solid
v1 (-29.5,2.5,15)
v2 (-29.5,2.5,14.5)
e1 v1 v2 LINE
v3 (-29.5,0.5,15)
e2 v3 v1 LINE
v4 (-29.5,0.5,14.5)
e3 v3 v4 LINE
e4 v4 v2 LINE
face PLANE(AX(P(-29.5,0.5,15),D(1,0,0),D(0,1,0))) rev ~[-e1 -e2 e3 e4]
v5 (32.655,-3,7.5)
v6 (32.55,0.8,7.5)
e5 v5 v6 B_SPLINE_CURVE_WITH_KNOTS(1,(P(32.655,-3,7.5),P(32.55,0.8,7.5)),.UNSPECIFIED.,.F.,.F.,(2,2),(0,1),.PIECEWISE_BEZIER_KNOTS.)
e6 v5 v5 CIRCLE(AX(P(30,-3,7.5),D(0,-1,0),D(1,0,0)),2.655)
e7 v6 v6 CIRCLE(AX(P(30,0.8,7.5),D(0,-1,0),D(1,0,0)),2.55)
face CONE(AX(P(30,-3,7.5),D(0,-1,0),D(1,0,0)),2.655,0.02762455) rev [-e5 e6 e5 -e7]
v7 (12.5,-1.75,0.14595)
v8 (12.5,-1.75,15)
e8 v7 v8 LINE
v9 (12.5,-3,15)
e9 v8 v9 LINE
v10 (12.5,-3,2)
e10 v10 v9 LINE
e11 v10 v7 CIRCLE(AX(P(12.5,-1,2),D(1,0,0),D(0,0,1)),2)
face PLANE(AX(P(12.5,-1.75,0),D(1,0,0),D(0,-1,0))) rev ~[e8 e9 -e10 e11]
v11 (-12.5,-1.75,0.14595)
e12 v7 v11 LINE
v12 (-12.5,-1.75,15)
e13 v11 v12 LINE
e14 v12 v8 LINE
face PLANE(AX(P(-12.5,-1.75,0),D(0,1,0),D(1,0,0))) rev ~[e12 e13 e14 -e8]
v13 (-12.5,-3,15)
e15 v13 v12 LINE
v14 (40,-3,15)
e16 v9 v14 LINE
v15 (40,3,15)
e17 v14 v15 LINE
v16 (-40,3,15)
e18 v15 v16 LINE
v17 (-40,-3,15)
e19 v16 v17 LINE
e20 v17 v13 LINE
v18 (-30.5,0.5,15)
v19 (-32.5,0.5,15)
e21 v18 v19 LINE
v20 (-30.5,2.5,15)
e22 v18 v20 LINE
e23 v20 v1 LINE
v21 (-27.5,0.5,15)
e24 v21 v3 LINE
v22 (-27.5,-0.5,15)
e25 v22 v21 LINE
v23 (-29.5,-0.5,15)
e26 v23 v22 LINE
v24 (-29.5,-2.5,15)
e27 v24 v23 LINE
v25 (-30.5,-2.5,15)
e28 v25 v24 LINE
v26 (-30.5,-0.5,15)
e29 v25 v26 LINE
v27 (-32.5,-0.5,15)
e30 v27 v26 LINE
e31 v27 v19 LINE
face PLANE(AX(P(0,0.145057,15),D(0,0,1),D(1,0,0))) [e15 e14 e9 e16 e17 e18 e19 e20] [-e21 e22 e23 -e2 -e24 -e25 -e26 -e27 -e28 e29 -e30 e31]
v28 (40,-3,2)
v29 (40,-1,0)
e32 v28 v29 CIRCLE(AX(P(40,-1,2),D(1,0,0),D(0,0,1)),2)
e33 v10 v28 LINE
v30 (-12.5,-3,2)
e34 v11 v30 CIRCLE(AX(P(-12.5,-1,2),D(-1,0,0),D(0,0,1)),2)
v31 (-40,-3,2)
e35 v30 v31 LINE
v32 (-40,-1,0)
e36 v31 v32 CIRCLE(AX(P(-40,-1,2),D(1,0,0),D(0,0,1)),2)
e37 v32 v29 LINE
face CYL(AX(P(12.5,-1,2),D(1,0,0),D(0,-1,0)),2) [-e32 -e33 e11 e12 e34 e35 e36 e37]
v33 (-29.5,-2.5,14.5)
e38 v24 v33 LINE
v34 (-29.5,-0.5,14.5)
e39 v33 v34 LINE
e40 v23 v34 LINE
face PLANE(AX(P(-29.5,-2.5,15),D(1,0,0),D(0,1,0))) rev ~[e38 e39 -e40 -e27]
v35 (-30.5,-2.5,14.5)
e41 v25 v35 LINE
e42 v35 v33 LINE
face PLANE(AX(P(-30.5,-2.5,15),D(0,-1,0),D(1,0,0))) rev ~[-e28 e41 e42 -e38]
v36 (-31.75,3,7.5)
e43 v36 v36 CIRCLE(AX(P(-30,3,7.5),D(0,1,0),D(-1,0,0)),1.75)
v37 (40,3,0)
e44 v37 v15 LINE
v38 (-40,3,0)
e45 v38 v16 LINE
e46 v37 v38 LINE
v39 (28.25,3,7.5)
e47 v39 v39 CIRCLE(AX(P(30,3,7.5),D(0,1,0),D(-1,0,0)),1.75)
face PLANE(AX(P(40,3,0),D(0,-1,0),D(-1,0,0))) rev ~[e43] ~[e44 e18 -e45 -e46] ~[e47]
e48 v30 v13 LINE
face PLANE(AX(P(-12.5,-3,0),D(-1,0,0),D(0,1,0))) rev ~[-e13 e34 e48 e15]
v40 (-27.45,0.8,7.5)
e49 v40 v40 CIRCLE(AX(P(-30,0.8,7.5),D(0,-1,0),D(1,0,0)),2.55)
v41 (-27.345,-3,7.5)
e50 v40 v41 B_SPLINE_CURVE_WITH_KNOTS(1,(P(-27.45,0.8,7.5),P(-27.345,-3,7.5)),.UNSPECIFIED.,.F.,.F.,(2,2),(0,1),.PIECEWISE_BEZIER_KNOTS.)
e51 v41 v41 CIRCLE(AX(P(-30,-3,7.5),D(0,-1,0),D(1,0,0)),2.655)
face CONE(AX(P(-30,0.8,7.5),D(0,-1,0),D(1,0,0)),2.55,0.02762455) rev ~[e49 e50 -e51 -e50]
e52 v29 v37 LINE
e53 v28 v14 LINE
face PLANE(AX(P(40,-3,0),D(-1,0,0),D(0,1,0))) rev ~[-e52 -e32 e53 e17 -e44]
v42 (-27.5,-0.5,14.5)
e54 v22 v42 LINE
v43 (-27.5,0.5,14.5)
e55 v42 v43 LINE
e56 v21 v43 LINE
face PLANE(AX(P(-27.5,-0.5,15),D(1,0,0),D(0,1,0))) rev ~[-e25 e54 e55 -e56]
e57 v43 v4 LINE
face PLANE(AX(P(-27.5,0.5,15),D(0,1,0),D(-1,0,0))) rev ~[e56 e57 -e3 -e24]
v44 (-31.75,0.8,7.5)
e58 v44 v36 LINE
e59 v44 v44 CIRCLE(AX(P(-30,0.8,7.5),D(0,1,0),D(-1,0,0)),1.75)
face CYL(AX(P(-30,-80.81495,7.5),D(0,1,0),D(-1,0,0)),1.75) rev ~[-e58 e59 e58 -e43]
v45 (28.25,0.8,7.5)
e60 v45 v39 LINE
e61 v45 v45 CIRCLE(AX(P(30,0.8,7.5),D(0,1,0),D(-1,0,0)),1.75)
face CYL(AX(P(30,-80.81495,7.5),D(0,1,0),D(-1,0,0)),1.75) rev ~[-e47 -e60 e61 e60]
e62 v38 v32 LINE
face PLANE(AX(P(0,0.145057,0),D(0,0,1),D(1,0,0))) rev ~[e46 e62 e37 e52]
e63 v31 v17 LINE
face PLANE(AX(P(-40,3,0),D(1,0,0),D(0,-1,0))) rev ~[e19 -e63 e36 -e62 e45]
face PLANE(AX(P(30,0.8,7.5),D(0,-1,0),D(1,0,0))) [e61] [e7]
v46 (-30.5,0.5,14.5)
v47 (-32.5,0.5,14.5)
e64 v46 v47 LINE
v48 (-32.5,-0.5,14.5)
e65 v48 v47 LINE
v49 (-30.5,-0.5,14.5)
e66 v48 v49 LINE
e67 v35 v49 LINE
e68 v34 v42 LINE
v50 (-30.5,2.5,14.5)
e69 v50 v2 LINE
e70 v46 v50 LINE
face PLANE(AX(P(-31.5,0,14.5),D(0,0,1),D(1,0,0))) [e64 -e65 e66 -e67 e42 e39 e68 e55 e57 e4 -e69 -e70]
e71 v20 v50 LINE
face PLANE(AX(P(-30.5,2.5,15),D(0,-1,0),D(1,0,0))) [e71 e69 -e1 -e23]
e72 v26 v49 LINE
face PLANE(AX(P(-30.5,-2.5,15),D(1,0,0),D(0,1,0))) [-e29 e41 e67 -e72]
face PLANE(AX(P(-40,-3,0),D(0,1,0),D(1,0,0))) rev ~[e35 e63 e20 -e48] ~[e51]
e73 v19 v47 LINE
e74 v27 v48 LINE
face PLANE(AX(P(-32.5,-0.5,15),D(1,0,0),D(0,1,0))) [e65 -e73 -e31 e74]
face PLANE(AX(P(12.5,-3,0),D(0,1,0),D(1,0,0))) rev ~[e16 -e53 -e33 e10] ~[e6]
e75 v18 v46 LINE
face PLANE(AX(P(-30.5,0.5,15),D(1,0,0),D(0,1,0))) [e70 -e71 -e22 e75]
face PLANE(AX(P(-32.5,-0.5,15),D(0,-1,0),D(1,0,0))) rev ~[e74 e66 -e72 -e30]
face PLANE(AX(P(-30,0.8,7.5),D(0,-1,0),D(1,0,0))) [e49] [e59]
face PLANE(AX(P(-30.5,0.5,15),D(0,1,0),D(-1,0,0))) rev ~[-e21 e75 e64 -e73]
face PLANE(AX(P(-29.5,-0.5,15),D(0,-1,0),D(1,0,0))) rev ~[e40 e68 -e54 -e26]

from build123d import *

# Parameters (mm, degrees)
F1_DEPTH  = 15
F4_R      = 2.55
F2_R      = 2.655
F7_D      = 3.5
F8_F1_R   = 2
F9_W      = 2
F9_H      = 1
F9_W_2    = 1
F9_H_2    = 2
F10_DEPTH = 0.5


with BuildPart() as f1:
    # F0 (on Top) → F1 (new body)
    with BuildSketch(Plane.XY):
        Polygon((12.5, -3), (40, -3), (40, 3), (-40, 3), (-40, -3), (-12.5, -3), (-12.5, -1.75), (12.5, -1.75), align=None)
    extrude(amount=F1_DEPTH)

    # F4 (on offset) → F5 section 0
    with BuildSketch(Plane.XZ.offset(-0.8)):
        with Locations((-30, 7.5)):
            Circle(F4_R)
    # F2 (on face) → F5 section 1
    with BuildSketch(Plane.XZ.offset(3)):
        with Locations((-30, 7.5)):
            Circle(F2_R)
    loft(mode=Mode.SUBTRACT)

    # F2 (on face) → F6 section 0
    with BuildSketch(Plane.XZ.offset(3)):
        with Locations((30, 7.5)):
            Circle(F2_R)
    # F4 (on offset) → F6 section 1
    with BuildSketch(Plane.XZ.offset(-0.8)):
        with Locations((30, 7.5)):
            Circle(F4_R)
    loft(mode=Mode.SUBTRACT)

    # F7 (through all)
    with Locations(Plane.XZ.offset(-0.8)):
        with Locations((30, 7.5), (-30, 7.5)):
            Hole(F7_D / 2)

    # F8: fillet of radius 2 on 2 edges, made by hand

    # F8_f1
    f8_f1_edges = [f1.edges().sort_by_distance(p)[0] for p in [
        (26.25, -3, 0),
    ]]
    fillet(f8_f1_edges, radius=F8_F1_R)

    # F9 (on face) → F10 (cut)
    with BuildSketch(Plane.XY.offset(15)):
        with Locations((-31.5, 0)):
            Rectangle(F9_W, F9_H)
        with Locations((-30, 0)):
            Rectangle(F9_W_2, F9_H)
        with Locations((-28.5, 0)):
            Rectangle(F9_W, F9_H)
        with Locations((-30, 1.5)):
            Rectangle(F9_W_2, F9_H_2)
        with Locations((-30, -1.5)):
            Rectangle(F9_W_2, F9_H_2)
    extrude(amount=-F10_DEPTH, mode=Mode.SUBTRACT)


solid = f1.part
